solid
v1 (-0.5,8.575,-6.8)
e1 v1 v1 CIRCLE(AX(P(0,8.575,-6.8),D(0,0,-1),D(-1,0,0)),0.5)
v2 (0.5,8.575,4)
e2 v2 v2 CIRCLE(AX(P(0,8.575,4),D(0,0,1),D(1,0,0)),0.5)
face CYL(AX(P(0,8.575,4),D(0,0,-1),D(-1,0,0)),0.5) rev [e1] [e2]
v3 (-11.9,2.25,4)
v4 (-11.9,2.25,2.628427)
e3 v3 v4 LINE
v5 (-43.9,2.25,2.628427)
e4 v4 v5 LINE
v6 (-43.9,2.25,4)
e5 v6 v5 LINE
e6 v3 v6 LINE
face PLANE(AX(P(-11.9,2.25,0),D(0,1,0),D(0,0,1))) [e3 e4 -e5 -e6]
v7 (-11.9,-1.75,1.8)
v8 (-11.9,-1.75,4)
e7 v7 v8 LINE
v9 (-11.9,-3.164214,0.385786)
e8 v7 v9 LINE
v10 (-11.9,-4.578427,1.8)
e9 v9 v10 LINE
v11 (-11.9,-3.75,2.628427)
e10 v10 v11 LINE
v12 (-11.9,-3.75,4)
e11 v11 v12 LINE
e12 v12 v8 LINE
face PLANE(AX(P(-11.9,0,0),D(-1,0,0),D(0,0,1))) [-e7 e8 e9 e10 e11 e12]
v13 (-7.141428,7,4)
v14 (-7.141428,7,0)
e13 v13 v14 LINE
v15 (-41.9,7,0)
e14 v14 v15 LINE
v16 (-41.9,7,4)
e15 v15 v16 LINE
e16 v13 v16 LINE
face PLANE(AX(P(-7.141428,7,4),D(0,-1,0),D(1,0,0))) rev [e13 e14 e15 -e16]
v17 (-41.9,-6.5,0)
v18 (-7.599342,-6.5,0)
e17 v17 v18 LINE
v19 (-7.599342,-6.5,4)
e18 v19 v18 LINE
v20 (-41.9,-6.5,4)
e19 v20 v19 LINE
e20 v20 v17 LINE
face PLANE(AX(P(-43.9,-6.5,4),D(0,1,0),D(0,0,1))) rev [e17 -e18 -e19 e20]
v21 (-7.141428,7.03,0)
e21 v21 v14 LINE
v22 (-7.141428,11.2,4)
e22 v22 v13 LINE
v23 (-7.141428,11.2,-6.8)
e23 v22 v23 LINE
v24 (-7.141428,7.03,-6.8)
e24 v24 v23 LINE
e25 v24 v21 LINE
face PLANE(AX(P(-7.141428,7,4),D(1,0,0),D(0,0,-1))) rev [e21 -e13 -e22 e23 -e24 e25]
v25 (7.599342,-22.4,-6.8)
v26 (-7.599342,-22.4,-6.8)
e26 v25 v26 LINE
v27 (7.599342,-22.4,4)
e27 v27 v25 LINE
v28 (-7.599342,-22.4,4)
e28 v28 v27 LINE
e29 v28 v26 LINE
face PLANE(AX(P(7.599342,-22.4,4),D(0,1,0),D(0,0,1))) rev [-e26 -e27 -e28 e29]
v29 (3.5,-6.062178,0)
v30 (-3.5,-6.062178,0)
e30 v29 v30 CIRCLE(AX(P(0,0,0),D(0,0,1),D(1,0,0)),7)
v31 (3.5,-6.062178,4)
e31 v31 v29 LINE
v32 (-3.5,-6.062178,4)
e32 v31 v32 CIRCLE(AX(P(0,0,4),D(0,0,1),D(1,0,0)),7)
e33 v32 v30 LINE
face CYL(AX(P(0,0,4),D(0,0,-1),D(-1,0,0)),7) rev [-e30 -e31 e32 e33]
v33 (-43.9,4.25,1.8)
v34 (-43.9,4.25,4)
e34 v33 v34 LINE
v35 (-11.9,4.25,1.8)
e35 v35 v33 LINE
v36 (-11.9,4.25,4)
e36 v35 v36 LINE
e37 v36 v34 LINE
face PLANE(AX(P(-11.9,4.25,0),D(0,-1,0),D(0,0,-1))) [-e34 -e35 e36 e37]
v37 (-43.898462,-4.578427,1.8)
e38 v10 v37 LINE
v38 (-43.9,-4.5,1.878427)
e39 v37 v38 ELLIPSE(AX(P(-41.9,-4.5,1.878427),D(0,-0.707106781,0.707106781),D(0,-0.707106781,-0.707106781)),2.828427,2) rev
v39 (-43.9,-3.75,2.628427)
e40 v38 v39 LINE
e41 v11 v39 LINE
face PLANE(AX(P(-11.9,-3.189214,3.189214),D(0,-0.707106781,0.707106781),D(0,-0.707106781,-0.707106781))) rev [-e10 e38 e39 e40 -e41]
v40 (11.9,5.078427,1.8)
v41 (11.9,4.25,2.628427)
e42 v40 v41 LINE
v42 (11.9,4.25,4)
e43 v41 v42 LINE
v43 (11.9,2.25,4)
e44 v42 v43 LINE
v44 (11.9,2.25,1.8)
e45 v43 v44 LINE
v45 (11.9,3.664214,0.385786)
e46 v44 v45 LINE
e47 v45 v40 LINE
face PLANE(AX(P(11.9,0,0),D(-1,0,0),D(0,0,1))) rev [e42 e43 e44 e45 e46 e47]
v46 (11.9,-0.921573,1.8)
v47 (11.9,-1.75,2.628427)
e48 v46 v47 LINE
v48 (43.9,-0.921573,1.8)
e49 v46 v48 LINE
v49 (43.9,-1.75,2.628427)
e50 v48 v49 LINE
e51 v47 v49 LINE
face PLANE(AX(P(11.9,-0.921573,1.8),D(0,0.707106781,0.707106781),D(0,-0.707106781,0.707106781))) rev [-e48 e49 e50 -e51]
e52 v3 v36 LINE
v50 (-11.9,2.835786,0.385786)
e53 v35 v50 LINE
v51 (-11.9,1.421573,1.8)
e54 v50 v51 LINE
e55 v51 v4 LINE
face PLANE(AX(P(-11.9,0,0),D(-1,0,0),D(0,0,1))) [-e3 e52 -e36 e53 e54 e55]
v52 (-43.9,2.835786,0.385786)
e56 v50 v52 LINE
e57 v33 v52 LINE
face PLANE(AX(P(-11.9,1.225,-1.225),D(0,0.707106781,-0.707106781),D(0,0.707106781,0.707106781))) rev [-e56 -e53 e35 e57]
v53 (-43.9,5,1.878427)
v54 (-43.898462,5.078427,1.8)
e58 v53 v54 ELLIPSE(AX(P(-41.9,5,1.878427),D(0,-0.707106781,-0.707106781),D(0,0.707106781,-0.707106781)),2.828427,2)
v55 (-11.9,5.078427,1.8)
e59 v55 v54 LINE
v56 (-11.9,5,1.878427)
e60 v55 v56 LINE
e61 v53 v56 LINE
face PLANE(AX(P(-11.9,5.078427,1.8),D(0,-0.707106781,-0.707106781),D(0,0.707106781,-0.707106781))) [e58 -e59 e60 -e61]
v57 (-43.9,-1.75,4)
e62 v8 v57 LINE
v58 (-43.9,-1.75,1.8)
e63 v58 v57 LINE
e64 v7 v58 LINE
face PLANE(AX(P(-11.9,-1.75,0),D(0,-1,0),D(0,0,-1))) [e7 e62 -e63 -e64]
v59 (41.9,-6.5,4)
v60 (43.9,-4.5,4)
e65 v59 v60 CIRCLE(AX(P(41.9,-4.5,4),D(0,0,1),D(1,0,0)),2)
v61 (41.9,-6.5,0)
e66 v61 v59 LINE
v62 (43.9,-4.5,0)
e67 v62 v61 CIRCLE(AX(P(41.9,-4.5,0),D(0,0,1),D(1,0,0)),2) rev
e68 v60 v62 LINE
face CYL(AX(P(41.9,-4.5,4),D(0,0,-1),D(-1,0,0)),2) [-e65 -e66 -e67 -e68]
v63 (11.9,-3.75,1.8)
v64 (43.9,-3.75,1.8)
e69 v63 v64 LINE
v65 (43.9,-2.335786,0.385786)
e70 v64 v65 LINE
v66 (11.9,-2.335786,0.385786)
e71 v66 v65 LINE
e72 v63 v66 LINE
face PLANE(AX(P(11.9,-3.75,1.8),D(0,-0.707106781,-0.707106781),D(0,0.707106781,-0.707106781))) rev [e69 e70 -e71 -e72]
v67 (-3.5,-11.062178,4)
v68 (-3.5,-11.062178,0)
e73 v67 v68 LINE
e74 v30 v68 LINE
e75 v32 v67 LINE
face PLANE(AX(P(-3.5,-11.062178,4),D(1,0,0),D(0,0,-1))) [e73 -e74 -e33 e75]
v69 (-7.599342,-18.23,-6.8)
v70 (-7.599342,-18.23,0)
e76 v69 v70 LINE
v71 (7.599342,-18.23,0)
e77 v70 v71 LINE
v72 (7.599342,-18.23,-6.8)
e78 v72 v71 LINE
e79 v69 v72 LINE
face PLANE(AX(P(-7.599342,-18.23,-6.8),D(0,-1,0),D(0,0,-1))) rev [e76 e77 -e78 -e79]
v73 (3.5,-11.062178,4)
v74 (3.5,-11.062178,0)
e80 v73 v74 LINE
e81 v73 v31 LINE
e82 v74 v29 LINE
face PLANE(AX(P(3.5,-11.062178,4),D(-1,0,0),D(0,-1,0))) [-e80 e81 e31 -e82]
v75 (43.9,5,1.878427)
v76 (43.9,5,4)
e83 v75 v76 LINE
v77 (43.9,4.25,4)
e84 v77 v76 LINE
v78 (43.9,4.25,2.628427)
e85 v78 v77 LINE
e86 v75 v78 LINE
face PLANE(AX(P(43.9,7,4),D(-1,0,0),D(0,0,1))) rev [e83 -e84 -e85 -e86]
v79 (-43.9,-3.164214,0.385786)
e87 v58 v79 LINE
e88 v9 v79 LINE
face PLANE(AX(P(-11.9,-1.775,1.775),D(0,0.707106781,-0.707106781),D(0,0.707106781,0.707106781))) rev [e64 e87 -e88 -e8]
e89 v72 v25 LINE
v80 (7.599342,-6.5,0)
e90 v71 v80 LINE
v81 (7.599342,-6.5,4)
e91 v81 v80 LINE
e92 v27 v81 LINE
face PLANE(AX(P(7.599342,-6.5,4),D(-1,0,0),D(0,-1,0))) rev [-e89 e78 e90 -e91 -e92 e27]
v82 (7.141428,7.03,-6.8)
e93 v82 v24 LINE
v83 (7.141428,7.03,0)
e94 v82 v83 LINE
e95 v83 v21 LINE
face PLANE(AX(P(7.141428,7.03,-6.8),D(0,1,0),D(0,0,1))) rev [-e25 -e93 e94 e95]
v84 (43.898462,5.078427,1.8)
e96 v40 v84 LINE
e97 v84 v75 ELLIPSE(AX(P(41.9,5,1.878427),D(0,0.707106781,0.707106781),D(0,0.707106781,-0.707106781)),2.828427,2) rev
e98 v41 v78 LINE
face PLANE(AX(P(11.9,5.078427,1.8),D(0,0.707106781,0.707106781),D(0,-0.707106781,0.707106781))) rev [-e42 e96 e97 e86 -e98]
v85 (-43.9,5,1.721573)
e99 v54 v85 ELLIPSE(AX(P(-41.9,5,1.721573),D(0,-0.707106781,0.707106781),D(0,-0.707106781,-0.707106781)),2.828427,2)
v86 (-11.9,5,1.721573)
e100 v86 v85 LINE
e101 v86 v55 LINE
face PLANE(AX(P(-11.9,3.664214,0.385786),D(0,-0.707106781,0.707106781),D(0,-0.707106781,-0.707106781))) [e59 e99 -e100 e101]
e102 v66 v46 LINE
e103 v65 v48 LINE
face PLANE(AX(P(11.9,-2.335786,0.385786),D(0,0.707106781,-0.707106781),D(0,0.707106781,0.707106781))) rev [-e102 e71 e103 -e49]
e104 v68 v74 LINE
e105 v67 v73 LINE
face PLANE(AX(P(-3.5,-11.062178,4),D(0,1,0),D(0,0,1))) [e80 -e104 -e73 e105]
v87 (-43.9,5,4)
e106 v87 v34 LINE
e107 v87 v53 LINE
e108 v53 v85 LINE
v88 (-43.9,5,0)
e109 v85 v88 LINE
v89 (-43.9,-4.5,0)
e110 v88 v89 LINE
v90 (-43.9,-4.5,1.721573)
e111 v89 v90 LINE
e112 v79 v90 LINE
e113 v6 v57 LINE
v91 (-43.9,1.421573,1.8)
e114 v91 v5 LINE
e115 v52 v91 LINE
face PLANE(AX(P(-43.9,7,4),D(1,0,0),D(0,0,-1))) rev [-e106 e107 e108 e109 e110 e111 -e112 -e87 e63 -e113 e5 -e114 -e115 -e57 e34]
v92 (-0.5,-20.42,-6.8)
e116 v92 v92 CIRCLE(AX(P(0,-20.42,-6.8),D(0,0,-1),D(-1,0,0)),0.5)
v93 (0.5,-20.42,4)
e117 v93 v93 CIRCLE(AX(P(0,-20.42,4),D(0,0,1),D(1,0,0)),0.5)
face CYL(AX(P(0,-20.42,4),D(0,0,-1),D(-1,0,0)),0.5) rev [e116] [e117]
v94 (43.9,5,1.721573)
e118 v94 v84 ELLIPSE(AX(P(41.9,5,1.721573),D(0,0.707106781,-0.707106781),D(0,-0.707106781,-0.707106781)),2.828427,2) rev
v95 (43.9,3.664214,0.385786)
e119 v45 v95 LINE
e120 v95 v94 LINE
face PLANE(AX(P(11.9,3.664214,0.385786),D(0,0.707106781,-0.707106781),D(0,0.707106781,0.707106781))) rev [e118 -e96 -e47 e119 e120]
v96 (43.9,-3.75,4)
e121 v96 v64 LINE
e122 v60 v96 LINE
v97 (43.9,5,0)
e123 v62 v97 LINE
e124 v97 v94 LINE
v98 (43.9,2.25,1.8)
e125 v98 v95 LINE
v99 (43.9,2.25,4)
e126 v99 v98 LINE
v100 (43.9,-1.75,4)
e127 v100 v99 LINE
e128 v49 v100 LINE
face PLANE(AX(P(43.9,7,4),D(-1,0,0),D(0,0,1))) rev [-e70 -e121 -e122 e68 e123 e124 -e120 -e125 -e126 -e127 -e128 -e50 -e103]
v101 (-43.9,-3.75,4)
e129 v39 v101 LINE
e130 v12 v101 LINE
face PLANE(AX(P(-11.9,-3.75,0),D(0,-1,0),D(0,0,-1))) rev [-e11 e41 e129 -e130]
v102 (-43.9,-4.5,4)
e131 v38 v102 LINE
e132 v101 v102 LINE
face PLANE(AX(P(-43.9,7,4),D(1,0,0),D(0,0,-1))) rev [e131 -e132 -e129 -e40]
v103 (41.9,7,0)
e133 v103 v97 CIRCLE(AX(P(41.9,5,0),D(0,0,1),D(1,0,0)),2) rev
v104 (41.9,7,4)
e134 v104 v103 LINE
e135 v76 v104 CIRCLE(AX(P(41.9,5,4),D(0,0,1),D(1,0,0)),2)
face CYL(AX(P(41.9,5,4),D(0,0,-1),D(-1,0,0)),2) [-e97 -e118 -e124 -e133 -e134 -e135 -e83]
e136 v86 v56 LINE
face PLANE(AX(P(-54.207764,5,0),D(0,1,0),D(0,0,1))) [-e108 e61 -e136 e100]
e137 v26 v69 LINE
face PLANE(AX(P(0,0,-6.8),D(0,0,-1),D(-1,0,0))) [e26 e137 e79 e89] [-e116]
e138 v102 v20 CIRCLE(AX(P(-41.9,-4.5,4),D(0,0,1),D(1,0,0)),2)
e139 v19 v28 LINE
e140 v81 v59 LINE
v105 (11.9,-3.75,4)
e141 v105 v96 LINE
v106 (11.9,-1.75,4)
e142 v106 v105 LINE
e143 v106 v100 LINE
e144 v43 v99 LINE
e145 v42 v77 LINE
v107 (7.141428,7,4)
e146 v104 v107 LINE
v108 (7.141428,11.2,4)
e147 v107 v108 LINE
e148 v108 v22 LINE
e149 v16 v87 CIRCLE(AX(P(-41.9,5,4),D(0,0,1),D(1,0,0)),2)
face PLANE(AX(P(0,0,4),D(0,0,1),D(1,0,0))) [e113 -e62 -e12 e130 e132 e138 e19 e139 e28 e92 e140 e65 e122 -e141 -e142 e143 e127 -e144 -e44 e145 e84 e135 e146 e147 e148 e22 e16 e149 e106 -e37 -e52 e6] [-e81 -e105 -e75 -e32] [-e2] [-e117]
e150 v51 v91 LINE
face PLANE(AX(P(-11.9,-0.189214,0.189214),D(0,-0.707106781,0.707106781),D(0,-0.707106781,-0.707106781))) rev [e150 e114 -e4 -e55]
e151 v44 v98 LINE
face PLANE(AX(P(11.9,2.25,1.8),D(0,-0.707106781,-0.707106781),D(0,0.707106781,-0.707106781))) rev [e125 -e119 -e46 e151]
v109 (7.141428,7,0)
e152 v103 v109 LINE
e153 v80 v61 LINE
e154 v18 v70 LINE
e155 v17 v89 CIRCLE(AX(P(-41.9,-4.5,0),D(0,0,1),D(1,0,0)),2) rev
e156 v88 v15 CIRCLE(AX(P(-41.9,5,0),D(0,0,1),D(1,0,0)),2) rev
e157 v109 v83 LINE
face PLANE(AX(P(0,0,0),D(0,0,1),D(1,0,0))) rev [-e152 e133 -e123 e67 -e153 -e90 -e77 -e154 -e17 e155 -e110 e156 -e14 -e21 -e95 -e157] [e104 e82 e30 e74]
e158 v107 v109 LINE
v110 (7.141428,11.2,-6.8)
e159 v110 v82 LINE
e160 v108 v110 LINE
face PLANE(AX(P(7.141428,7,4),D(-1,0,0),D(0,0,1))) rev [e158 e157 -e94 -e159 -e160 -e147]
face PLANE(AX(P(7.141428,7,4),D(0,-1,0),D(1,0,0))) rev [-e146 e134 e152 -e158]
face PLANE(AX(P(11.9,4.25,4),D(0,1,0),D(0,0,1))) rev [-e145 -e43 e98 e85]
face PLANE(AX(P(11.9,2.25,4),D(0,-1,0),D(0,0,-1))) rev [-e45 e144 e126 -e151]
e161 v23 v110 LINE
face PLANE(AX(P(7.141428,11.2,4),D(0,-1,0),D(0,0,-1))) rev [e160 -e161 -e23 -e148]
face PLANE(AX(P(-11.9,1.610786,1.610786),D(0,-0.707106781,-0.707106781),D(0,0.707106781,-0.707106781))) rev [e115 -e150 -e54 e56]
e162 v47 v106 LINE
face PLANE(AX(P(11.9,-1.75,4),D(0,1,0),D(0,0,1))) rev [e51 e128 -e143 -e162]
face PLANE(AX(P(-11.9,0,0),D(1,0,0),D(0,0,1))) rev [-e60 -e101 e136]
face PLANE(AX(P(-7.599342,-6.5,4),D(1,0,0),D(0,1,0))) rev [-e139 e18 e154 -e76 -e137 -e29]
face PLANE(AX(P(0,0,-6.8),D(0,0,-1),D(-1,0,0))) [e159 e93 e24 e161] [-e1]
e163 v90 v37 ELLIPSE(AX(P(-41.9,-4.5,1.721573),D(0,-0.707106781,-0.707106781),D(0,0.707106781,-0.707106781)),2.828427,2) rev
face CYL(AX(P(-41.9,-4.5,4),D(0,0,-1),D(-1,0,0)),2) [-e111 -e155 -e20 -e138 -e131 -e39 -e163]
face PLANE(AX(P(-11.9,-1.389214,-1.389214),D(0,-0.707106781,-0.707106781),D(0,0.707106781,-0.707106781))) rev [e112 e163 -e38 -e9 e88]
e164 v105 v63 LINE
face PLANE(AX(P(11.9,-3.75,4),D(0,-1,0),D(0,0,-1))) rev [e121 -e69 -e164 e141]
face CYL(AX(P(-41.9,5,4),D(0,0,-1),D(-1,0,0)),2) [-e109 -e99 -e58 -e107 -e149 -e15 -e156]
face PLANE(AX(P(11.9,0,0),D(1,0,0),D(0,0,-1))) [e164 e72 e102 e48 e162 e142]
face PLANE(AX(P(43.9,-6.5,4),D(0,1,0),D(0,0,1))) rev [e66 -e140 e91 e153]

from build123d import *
from build123d.topology import SkipClean

# Parameters (mm, degrees)
SKETCH_1_R              = 0.5
EXTRUDE_1_DEPTH         = 4
CUT_EXTRUDE_1_DEPTH     = 32
FILLET_2_R              = 2
EXTRUDE_START           = 6.8
SKETCH_3_W              = 14.282856858
SKETCH_3_H              = 4.17
SKETCH_3_R              = 0.5
SKETCH_3_W_2            = 15.198684154
EXTRUDE_2_DEPTH         = 6.8
SALIENTE_EXTRUIR1_START = -32
SALIENTE_EXTRUIR1_DEPTH = 32
CORTAR_EXTRUIR1_DEPTH   = 32


with BuildPart() as part:
    # 草图1 → 凸台-拉伸1 (new body)
    with BuildSketch(Plane.XY):
        Polygon((7.141428429, 7), (43.9, 7), (43.9, -6.5), (7.599342077, -6.5), (7.599342077, -22.4), (-7.599342077, -22.4), (-7.599342077, -6.5), (-43.9, -6.5), (-43.9, 7), (-7.141428429, 7), (-7.141428429, 11.2), (7.141428429, 11.2), align=None)
        with Locations((0, 8.575)):
            Circle(SKETCH_1_R, mode=Mode.SUBTRACT)
        with Locations((0, -20.42)):
            Circle(SKETCH_1_R, mode=Mode.SUBTRACT)
        with BuildLine():
            Line((-3.5, -11.062177826), (3.5, -11.062177826))
            Line((3.5, -11.062177826), (3.5, -6.062177826))
            ThreePointArc((3.5, -6.062177826), (0, 7), (-3.5, -6.062177826))
            Line((-3.5, -6.062177826), (-3.5, -11.062177826))
        make_face(mode=Mode.SUBTRACT)
    extrude(amount=EXTRUDE_1_DEPTH)

    # 草图2 → 切除-拉伸1 (cut)
    with BuildSketch(Plane(origin=(43.9, 0, 0), x_dir=(0, 0, -1), z_dir=(1, 0, 0))):
        Polygon((-4, 2.25), (-1.8, 2.25), (-0.385786438, 3.664213562), (-1.8, 5.078427125), (-2.628427125, 4.25), (-4, 4.25), align=None)
        Polygon((-1.8, -3.75), (-0.385786438, -2.335786438), (-1.8, -0.921572875), (-2.628427125, -1.75), (-4, -1.75), (-4, -3.75), align=None)
    cut_extrude_1 = extrude(amount=-CUT_EXTRUDE_1_DEPTH, mode=Mode.SUBTRACT)

    # 镜向1: 切除-拉伸1 across plane
    add(cut_extrude_1.mirror(Plane(origin=(0, 0, 0), x_dir=(0, 0, 1), z_dir=(1, 0, 0))), mode=Mode.SUBTRACT)

    # 圆角2
    # the kernel refuses this fillet: 2 mm, written as the material it takes off along each edge
    with BuildSketch(Plane(origin=(43.9, 7, -5), x_dir=(-1, 0, 0), z_dir=(0, 0, 1)), Plane(origin=(43.9, -6.5, -5), x_dir=(0, 1, 0), z_dir=(0, 0, 1)), Plane(origin=(-43.9, -6.5, -5), x_dir=(1, 0, 0), z_dir=(0, 0, 1)), Plane(origin=(-43.9, 7, -5), x_dir=(0, -1, 0), z_dir=(0, 0, 1))) as fillet_2_piece_1:
        with BuildLine():
            CenterArc((FILLET_2_R, FILLET_2_R), FILLET_2_R, 180, 90)
            Line((0, FILLET_2_R), (0, 0))
            Line((0, 0), (FILLET_2_R, 0))
        make_face()
    extrude(amount=14, mode=Mode.SUBTRACT)

    # 草图3 → 凸台-拉伸2 (add)
    # profile 1 of 2: a face of its own
    with BuildSketch(Plane(origin=(0, 0, 0), x_dir=(-1, 0, 0), z_dir=(0, 0, -1)).offset(EXTRUDE_START)):
        with Locations((0, 9.115)):
            Rectangle(SKETCH_3_W, SKETCH_3_H)
        with Locations((0, 8.575)):
            Circle(SKETCH_3_R, mode=Mode.SUBTRACT)
    # profile 2 of 2: a face of its own
    with BuildSketch(Plane(origin=(0, 0, 0), x_dir=(-1, 0, 0), z_dir=(0, 0, -1)).offset(EXTRUDE_START)):
        with Locations((0, -20.315)):
            Rectangle(SKETCH_3_W_2, SKETCH_3_H)
        with Locations((0, -20.42)):
            Circle(SKETCH_3_R, mode=Mode.SUBTRACT)
    extrude(amount=-EXTRUDE_2_DEPTH)

    # Croquis1 → Saliente-Extruir1 (add)
    with SkipClean():  # the faces are left unmerged after this step: merging them gives an invalid solid
        with BuildSketch(Plane.ZY.offset(43.9).offset(SALIENTE_EXTRUIR1_START)):
            Polygon((1.721572875, 5), (0, 5), (0, -4.5), (4, -4.5), (4, -3.75), (1.8, -3.75), (0.385786438, -2.335786438), (1.8, -0.921572875), (2.628427125, -1.75), (4, -1.75), (4, 2.25), (1.8, 2.25), (0.385786438, 3.664213562), align=None)
            Polygon((1.8, -3.75), (4, -3.75), (4, -1.75), (2.628427125, -1.75), (1.8, -0.921572875), (0.385786438, -2.335786438), align=None)
            Polygon((4, 5), (1.721572875, 5), (0.385786438, 3.664213562), (1.8, 2.25), (4, 2.25), align=None)
        extrude(amount=SALIENTE_EXTRUIR1_DEPTH)
    add(part.part.scale(1), mode=Mode.REPLACE)  # the faces are merged on a copy

    # Croquis4 → Cortar-Extruir1 (cut)
    with BuildSketch(Plane.ZY.offset(43.9)):
        Polygon((0.385786438, -3.164213562), (1.8, -4.578427125), (2.628427125, -3.75), (4, -3.75), (4, -1.75), (1.8, -1.75), align=None)
        Polygon((2.628427125, 2.25), (4, 2.25), (4, 4.25), (1.8, 4.25), (0.385786438, 2.835786438), (1.8, 1.421572875), align=None)
    extrude(amount=-CORTAR_EXTRUIR1_DEPTH, mode=Mode.SUBTRACT)


solid = part.part
